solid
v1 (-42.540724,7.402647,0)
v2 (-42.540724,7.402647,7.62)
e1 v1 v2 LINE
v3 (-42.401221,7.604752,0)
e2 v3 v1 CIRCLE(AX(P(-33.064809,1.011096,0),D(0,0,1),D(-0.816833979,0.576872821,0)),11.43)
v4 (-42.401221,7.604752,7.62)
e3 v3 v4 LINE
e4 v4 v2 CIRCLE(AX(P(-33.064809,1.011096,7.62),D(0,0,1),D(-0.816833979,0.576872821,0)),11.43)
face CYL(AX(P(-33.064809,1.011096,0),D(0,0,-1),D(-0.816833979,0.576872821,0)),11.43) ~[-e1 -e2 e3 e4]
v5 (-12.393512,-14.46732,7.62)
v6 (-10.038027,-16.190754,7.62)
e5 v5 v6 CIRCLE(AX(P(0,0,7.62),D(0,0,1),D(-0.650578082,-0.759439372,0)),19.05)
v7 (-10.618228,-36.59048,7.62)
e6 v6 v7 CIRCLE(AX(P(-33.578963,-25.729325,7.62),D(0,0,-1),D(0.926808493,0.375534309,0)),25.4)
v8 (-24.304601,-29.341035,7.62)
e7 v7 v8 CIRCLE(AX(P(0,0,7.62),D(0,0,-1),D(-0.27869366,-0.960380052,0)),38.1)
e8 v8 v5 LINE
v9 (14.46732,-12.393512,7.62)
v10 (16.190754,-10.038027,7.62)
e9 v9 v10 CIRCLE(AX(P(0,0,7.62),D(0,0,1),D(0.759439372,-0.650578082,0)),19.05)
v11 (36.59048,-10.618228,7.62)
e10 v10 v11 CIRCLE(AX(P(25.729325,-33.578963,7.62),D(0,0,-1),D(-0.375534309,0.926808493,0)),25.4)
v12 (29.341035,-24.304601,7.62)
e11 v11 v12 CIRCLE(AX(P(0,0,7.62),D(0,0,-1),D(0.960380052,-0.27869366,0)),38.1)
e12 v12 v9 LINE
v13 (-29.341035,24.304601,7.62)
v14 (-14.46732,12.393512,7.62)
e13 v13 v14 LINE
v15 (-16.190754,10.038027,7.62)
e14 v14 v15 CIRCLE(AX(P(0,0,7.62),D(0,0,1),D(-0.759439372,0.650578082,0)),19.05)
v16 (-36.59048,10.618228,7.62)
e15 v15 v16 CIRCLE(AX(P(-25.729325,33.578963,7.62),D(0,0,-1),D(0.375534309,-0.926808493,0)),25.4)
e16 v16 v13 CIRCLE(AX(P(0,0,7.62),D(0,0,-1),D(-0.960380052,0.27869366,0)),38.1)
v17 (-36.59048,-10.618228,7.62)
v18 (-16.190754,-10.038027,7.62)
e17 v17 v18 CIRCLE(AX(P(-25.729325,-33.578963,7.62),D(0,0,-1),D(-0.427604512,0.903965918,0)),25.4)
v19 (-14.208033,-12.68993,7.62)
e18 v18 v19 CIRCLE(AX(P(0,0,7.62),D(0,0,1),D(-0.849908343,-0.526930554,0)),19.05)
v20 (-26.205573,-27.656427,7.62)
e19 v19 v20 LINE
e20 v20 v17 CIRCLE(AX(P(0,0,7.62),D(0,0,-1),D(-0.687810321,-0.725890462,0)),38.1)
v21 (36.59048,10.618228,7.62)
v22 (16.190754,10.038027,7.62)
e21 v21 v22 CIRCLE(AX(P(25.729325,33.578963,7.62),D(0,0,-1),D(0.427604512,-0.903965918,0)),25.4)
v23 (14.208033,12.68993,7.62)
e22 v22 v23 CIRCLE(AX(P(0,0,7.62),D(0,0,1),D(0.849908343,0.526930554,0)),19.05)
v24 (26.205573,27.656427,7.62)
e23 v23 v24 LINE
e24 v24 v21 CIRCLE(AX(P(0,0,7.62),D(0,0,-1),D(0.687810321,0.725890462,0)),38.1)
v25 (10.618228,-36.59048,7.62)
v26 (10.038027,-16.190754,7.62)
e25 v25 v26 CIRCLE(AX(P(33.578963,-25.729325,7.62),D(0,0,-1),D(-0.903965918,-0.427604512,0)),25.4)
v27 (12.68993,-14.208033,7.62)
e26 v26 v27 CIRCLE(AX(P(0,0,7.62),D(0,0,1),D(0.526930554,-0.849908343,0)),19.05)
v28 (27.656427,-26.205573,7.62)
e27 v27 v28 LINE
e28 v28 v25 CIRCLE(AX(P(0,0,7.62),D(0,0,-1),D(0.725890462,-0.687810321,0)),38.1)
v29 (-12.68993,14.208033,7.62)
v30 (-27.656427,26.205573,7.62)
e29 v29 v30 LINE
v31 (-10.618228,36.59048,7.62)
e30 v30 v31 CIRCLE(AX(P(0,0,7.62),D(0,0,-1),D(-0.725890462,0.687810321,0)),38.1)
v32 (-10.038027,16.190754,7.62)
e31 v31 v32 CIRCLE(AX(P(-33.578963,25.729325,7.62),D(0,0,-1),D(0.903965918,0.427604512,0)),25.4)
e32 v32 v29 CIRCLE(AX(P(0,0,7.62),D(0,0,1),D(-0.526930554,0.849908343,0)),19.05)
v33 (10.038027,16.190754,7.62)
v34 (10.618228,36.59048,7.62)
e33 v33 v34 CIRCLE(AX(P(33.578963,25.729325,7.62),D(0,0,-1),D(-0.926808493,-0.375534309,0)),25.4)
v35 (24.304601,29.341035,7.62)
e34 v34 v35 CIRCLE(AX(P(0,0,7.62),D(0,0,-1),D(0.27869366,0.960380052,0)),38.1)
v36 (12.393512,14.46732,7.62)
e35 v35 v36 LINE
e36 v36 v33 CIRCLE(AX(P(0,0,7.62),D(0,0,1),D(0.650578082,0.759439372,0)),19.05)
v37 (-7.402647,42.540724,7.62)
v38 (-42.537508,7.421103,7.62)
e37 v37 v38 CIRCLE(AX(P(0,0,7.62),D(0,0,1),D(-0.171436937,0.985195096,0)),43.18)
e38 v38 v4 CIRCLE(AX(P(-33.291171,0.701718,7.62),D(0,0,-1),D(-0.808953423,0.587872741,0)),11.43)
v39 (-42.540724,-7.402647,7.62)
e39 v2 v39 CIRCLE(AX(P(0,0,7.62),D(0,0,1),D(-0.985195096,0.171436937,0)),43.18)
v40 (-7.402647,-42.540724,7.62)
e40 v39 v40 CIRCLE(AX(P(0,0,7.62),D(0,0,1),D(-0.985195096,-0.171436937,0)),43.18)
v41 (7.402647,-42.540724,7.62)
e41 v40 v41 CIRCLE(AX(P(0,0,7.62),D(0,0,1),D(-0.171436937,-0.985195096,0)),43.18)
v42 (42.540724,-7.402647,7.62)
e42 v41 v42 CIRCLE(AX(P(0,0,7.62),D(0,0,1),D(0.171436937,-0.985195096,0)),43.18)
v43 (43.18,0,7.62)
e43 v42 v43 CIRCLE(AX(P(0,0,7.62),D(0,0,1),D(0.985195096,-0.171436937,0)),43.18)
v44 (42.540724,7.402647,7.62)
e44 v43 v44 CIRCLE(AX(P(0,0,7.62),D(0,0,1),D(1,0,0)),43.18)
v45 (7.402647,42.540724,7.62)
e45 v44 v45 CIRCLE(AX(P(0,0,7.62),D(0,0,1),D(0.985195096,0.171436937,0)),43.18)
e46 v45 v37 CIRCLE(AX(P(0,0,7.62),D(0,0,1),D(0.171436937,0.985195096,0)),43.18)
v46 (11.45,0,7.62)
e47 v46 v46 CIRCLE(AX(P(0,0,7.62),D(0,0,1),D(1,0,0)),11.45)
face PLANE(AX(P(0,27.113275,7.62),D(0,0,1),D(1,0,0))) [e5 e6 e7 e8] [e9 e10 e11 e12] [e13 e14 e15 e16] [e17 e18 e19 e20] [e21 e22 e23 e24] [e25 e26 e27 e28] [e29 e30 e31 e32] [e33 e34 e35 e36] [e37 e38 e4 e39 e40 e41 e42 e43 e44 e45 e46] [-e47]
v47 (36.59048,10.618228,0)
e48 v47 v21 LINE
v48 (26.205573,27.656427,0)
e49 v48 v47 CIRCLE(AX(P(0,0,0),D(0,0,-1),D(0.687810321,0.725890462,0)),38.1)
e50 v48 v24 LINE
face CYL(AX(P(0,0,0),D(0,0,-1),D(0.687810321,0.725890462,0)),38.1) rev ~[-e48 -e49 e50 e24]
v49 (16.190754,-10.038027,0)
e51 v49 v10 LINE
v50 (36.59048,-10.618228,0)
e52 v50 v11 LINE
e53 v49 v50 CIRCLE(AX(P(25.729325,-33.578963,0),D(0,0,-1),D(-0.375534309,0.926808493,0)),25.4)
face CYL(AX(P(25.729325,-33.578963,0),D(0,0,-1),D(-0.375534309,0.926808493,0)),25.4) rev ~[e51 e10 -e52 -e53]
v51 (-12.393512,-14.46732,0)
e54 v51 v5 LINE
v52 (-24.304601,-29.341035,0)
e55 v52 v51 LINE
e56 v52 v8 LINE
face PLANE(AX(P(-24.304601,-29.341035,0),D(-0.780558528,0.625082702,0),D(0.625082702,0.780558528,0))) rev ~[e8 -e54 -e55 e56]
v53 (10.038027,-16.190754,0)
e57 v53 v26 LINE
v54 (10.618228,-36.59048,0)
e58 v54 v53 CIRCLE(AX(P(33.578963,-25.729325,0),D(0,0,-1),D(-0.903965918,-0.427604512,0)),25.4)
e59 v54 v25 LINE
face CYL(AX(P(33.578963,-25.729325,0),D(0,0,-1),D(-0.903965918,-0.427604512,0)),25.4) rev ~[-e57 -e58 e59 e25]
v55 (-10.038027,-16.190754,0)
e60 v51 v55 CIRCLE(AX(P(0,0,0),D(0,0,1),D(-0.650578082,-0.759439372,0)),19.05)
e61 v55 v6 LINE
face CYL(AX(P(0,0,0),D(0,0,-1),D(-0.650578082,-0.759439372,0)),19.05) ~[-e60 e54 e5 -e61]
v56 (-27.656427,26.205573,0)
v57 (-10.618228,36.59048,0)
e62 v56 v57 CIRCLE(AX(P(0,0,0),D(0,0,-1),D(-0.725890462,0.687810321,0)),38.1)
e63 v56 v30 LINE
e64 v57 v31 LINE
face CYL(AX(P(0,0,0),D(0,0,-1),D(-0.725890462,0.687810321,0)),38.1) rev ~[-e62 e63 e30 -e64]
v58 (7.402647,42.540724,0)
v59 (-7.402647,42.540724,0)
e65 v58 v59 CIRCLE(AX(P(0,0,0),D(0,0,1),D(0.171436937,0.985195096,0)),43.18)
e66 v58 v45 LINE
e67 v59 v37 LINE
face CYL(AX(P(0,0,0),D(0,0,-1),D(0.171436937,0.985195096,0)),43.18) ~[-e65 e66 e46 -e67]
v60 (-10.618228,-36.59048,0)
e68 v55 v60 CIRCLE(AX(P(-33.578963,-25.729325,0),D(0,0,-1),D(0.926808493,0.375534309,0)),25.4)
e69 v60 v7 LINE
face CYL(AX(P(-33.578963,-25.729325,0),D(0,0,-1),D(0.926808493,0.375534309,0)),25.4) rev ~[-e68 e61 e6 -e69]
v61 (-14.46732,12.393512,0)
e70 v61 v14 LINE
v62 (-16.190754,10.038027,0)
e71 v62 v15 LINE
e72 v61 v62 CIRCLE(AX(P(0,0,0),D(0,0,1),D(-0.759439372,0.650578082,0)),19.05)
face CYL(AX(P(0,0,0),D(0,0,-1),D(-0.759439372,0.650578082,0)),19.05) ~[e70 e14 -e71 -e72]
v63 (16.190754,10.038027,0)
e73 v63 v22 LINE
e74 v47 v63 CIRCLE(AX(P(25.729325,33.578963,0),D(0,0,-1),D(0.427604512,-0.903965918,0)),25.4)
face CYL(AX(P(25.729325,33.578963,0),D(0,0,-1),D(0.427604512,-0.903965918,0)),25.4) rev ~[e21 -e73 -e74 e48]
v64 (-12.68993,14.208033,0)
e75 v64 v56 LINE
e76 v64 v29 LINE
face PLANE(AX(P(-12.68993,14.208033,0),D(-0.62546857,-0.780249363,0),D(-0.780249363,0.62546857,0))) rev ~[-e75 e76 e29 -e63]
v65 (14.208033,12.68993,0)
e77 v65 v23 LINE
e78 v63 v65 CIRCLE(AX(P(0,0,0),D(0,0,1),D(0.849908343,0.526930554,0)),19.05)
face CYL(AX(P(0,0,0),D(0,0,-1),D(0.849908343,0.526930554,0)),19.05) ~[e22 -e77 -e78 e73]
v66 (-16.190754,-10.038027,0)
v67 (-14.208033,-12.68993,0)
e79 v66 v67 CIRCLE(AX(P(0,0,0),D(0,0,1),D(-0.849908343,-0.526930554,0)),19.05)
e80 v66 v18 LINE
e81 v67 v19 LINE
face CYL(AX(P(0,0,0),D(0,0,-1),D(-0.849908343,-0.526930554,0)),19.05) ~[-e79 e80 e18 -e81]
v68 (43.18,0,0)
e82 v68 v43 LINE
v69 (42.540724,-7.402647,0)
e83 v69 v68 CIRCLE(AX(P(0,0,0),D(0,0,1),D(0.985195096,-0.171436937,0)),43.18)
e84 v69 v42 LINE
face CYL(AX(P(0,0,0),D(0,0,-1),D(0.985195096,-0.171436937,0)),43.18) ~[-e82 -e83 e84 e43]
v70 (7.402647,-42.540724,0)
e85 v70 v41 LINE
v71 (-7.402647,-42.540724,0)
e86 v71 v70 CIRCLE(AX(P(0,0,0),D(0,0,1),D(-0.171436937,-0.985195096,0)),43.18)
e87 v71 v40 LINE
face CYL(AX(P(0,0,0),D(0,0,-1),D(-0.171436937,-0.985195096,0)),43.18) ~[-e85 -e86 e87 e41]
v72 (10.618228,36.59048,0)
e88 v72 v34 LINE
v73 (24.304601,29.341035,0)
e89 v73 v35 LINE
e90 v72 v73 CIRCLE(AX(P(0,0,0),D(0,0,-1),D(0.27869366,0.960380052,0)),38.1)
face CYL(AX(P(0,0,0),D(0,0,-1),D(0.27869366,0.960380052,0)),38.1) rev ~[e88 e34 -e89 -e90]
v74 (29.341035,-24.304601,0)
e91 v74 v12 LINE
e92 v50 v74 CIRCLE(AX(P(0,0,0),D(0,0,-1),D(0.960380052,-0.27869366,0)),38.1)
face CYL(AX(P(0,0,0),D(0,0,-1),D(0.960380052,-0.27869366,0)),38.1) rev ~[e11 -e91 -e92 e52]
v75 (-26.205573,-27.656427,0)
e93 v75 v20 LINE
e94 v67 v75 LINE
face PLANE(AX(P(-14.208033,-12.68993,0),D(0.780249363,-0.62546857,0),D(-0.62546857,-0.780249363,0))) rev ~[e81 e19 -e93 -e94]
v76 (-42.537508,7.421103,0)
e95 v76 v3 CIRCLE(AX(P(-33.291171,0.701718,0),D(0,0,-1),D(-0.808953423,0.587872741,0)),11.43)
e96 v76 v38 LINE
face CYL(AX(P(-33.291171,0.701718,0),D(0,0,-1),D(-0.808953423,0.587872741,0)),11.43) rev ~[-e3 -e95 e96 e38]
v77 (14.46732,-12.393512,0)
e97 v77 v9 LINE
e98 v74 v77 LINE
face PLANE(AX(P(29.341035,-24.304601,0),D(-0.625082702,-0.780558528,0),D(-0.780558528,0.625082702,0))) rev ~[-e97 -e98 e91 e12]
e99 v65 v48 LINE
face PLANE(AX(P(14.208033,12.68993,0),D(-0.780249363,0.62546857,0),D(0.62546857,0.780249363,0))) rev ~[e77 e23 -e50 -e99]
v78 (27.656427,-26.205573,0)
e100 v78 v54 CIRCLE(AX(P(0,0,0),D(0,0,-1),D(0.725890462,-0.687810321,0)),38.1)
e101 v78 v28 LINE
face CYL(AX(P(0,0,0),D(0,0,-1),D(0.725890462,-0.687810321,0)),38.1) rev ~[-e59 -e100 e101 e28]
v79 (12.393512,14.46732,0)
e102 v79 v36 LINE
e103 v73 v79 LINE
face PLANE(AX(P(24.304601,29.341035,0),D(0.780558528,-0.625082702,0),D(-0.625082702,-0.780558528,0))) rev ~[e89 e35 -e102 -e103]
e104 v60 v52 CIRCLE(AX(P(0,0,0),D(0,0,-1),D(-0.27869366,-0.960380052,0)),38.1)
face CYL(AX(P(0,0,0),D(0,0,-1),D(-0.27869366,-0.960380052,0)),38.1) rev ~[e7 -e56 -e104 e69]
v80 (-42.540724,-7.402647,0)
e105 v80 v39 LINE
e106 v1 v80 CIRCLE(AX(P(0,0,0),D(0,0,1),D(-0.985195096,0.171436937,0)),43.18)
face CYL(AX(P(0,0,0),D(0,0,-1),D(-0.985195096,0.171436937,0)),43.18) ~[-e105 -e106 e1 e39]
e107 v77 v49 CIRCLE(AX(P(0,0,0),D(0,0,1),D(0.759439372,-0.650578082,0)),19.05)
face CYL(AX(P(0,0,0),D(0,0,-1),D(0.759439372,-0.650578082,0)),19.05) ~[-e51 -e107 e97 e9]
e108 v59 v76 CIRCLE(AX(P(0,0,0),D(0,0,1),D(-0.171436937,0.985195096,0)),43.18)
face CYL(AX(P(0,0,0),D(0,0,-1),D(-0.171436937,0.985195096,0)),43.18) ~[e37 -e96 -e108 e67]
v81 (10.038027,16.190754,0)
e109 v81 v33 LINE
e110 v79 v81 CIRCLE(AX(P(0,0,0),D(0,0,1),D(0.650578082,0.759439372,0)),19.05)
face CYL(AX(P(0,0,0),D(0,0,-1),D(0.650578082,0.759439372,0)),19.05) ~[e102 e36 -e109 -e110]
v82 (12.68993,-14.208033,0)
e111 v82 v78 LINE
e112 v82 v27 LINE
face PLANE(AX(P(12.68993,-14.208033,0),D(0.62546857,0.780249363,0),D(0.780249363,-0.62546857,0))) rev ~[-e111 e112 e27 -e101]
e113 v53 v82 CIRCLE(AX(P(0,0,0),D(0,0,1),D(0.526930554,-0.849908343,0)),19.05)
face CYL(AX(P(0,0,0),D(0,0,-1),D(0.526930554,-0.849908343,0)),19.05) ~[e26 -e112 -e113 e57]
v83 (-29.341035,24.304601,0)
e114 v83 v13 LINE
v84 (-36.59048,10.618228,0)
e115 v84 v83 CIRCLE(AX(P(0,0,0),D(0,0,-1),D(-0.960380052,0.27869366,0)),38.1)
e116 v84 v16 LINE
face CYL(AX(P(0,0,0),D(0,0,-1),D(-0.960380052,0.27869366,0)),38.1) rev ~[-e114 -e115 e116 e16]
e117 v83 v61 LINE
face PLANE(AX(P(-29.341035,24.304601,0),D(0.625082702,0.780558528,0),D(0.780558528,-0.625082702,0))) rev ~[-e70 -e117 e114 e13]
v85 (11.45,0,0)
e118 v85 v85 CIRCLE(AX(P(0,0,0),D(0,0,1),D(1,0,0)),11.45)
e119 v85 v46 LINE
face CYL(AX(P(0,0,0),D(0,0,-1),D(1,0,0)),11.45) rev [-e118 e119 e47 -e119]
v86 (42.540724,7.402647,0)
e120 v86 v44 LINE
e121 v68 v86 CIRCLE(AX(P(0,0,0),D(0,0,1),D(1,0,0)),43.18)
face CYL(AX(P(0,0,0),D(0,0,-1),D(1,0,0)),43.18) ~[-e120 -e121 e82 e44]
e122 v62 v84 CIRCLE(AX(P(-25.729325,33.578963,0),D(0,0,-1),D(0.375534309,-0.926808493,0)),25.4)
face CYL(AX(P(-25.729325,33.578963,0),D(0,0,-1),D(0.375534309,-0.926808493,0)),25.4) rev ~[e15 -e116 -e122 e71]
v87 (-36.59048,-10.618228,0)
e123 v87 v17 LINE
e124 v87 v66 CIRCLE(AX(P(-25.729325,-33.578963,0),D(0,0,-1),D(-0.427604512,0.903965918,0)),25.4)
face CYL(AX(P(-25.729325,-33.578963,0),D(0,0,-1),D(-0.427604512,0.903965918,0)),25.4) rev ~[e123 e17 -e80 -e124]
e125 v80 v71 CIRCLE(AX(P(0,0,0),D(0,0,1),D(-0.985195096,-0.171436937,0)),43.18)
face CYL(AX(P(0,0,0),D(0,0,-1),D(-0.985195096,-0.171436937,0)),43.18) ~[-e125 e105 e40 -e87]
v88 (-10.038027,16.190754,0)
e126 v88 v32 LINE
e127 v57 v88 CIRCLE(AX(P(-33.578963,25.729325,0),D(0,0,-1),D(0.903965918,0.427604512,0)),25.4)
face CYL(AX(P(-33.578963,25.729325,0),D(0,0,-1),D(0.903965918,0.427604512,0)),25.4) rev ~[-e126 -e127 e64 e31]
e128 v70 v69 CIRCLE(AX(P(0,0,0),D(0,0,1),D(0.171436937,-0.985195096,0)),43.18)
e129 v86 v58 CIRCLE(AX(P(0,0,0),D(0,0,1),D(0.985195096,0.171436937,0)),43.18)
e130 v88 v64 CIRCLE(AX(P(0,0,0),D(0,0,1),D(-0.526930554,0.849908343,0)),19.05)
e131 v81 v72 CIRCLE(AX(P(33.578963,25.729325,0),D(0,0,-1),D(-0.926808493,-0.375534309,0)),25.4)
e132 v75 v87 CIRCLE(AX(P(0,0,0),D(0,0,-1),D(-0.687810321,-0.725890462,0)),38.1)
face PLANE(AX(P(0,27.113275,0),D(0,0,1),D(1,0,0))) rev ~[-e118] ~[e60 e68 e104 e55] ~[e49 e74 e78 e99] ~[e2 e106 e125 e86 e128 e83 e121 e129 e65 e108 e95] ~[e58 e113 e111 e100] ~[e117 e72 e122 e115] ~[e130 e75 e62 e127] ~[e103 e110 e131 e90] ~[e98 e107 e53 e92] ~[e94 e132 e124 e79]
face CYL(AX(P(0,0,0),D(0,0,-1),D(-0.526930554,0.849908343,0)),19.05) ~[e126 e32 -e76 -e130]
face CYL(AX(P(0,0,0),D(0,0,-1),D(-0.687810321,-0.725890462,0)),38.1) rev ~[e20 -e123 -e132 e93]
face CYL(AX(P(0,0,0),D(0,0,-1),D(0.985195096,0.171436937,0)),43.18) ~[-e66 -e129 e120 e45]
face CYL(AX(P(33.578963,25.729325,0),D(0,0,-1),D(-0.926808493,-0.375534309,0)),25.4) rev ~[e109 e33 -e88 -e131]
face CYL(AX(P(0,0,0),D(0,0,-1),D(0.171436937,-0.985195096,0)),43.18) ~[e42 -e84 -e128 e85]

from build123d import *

# Parameters (mm, degrees)
F0_R     = 11.45
F1_DEPTH = 7.62


# Not quite as in the source:
# - a feature names something its author has since deleted; it is built from what else it names


with BuildPart() as f1:
    # F0 (on Top) → F1 (new body)
    with BuildSketch(Plane.XY):
        with BuildLine():
            ThreePointArc((-10.038027058, 16.1907539288), (0, 19.05), (10.038027058, 16.1907539288))
            ThreePointArc((10.038027058, 16.1907539288), (8.1892299167, 26.451450684), (10.618228457, 36.59047997))
            ThreePointArc((10.618228457, 36.59047997), (0, 38.1), (-10.618228457, 36.59047997))
            ThreePointArc((-10.618228457, 36.59047997), (-8.1892299167, 26.451450684), (-10.038027058, 16.1907539288))
        make_face()
        with BuildLine():
            ThreePointArc((16.1907539288, -10.038027058), (18.3212494435, -5.2186510544), (19.05, 0))
            ThreePointArc((19.05, 0), (18.3212494435, 5.2186510544), (16.1907539288, 10.038027058))
            ThreePointArc((16.1907539288, 10.038027058), (15.2571196867, 11.4071380664), (14.208032523, 12.6899295438))
            ThreePointArc((14.208032523, 12.6899295438), (13.3304286547, 13.6089004655), (12.3935124609, 14.4673200311))
            ThreePointArc((12.3935124609, 14.4673200311), (11.2488242673, 15.3742138857), (10.038027058, 16.1907539288))
            ThreePointArc((10.038027058, 16.1907539288), (0, 19.05), (-10.038027058, 16.1907539288))
            ThreePointArc((-10.038027058, 16.1907539288), (-11.4071380664, 15.2571196867), (-12.6899295437, 14.208032523))
            ThreePointArc((-12.6899295437, 14.208032523), (-13.6089004655, 13.3304286548), (-14.467320031, 12.3935124609))
            ThreePointArc((-14.467320031, 12.3935124609), (-15.3742138857, 11.2488242673), (-16.1907539288, 10.038027058))
            ThreePointArc((-16.1907539288, 10.038027058), (-19.05, 0), (-16.1907539288, -10.038027058))
            ThreePointArc((-16.1907539288, -10.038027058), (-15.2571196867, -11.4071380664), (-14.208032523, -12.6899295437))
            ThreePointArc((-14.208032523, -12.6899295437), (-13.3304286548, -13.6089004655), (-12.3935124609, -14.467320031))
            ThreePointArc((-12.3935124609, -14.467320031), (-11.2488242673, -15.3742138857), (-10.038027058, -16.1907539288))
            ThreePointArc((-10.038027058, -16.1907539288), (0, -19.05), (10.038027058, -16.1907539288))
            ThreePointArc((10.038027058, -16.1907539288), (11.4071380664, -15.2571196867), (12.6899295438, -14.208032523))
            ThreePointArc((12.6899295438, -14.208032523), (13.6089004655, -13.3304286547), (14.4673200311, -12.3935124609))
            ThreePointArc((14.4673200311, -12.3935124609), (15.3742138857, -11.2488242673), (16.1907539288, -10.038027058))
        make_face()
        Circle(F0_R, mode=Mode.SUBTRACT)
        with BuildLine():
            ThreePointArc((-10.618228457, 36.59047997), (0, 38.1), (10.618228457, 36.59047997))
            ThreePointArc((10.618228457, 36.59047997), (10.9631553547, 37.2915593412), (11.3294826074, 37.9816978733))
            ThreePointArc((11.3294826074, 37.9816978733), (9.6714472488, 40.5242467677), (7.4026469551, 42.5407242305))
            ThreePointArc((7.4026469551, 42.5407242305), (0, 43.18), (-7.4026469551, 42.5407242305))
            ThreePointArc((-7.4026469551, 42.5407242305), (-9.6714472488, 40.5242467677), (-11.3294826074, 37.9816978733))
            ThreePointArc((-11.3294826074, 37.9816978733), (-10.9631553547, 37.2915593412), (-10.618228457, 36.59047997))
        make_face()
        with BuildLine():
            ThreePointArc((-27.6564265836, 26.2055732359), (-19.8292429656, 32.5332310632), (-10.618228457, 36.59047997))
            ThreePointArc((-10.618228457, 36.59047997), (-10.9631553547, 37.2915593412), (-11.3294826074, 37.9816978733))
            ThreePointArc((-11.3294826074, 37.9816978733), (-9.6714472488, 40.5242467677), (-7.4026469551, 42.5407242305))
            ThreePointArc((-7.4026469551, 42.5407242305), (-30.5262465043, 30.5394936821), (-42.5375084691, 7.4211032363))
            ThreePointArc((-42.5375084691, 7.4211032363), (-42.4698240182, 7.5132687267), (-42.401220917, 7.6047524795))
            ThreePointArc((-42.401220917, 7.6047524795), (-40.430781391, 9.7510814924), (-37.9816978733, 11.3294826074))
            ThreePointArc((-37.9816978733, 11.3294826074), (-37.2915593412, 10.9631553547), (-36.59047997, 10.618228457))
            ThreePointArc((-36.59047997, 10.618228457), (-33.6685368778, 17.8336654815), (-29.3410352271, 24.3046014533))
            ThreePointArc((-29.3410352271, 24.3046014533), (-28.5145767397, 25.2691296517), (-27.6564265836, 26.2055732359))
        make_face()
        with BuildLine():
            ThreePointArc((-11.3294826074, -37.9816978733), (-10.9631553547, -37.2915593412), (-10.618228457, -36.59047997))
            ThreePointArc((-10.618228457, -36.59047997), (-17.8336654815, -33.6685368778), (-24.3046014533, -29.3410352271))
            ThreePointArc((-24.3046014533, -29.3410352271), (-25.2691296517, -28.5145767397), (-26.2055732359, -27.6564265836))
            ThreePointArc((-26.2055732359, -27.6564265836), (-32.5332310632, -19.8292429656), (-36.59047997, -10.618228457))
            ThreePointArc((-36.59047997, -10.618228457), (-37.2915593412, -10.9631553547), (-37.9816978733, -11.3294826074))
            ThreePointArc((-37.9816978733, -11.3294826074), (-40.5242467677, -9.6714472488), (-42.5407242305, -7.4026469551))
            ThreePointArc((-42.5407242305, -7.4026469551), (-30.5328708116, -30.5328708116), (-7.4026469551, -42.5407242305))
            ThreePointArc((-7.4026469551, -42.5407242305), (-9.6714472488, -40.5242467677), (-11.3294826074, -37.9816978733))
        make_face()
        with BuildLine():
            Line((-24.3046014533, -29.3410352271), (-12.3935124609, -14.467320031))
            ThreePointArc((-12.3935124609, -14.467320031), (-13.3304286548, -13.6089004655), (-14.208032523, -12.6899295437))
            Line((-14.208032523, -12.6899295437), (-26.2055732359, -27.6564265836))
            ThreePointArc((-26.2055732359, -27.6564265836), (-25.2691296517, -28.5145767397), (-24.3046014533, -29.3410352271))
        make_face()
        with BuildLine():
            ThreePointArc((10.6182284569, -36.59047997), (8.1892299167, -26.451450684), (10.038027058, -16.1907539288))
            ThreePointArc((10.038027058, -16.1907539288), (0, -19.05), (-10.038027058, -16.1907539288))
            ThreePointArc((-10.038027058, -16.1907539288), (-8.1892299167, -26.451450684), (-10.618228457, -36.59047997))
            ThreePointArc((-10.618228457, -36.59047997), (0, -38.1), (10.6182284569, -36.59047997))
        make_face()
        with BuildLine():
            ThreePointArc((11.3294826074, -37.9816978733), (10.9631553547, -37.2915593412), (10.6182284569, -36.59047997))
            ThreePointArc((10.6182284569, -36.59047997), (0, -38.1), (-10.618228457, -36.59047997))
            ThreePointArc((-10.618228457, -36.59047997), (-10.9631553547, -37.2915593412), (-11.3294826074, -37.9816978733))
            ThreePointArc((-11.3294826074, -37.9816978733), (-9.6714472488, -40.5242467677), (-7.4026469551, -42.5407242305))
            ThreePointArc((-7.4026469551, -42.5407242305), (0, -43.18), (7.4026469551, -42.5407242305))
            ThreePointArc((7.4026469551, -42.5407242305), (9.6714472488, -40.5242467677), (11.3294826074, -37.9816978733))
        make_face()
        with BuildLine():
            ThreePointArc((37.9816978733, 11.3294826074), (37.2915593412, 10.9631553547), (36.59047997, 10.6182284569))
            ThreePointArc((36.59047997, 10.6182284569), (37.7207322759, 5.3624953679), (38.1, 0))
            ThreePointArc((38.1, 0), (37.7207322759, -5.3624953679), (36.59047997, -10.618228457))
            ThreePointArc((36.59047997, -10.618228457), (37.2915593412, -10.9631553547), (37.9816978733, -11.3294826074))
            ThreePointArc((37.9816978733, -11.3294826074), (40.5242467677, -9.6714472488), (42.5407242305, -7.4026469551))
            ThreePointArc((42.5407242305, -7.4026469551), (43.0198841948, -3.7150994419), (43.18, 0))
            ThreePointArc((43.18, 0), (43.0198841948, 3.7150994419), (42.5407242305, 7.4026469551))
            ThreePointArc((42.5407242305, 7.4026469551), (40.5242467677, 9.6714472488), (37.9816978733, 11.3294826074))
        make_face()
        with BuildLine():
            ThreePointArc((16.1907539288, 10.038027058), (18.3212494435, 5.2186510544), (19.05, 0))
            ThreePointArc((19.05, 0), (18.3212494435, -5.2186510544), (16.1907539288, -10.038027058))
            ThreePointArc((16.1907539288, -10.038027058), (26.451450684, -8.1892299167), (36.59047997, -10.618228457))
            ThreePointArc((36.59047997, -10.618228457), (37.7207322759, -5.3624953679), (38.1, 0))
            ThreePointArc((38.1, 0), (37.7207322759, 5.3624953679), (36.59047997, 10.6182284569))
            ThreePointArc((36.59047997, 10.6182284569), (26.451450684, 8.1892299167), (16.1907539288, 10.038027058))
        make_face()
        with BuildLine():
            Line((29.3410352271, -24.3046014533), (14.467320031, -12.3935124609))
            ThreePointArc((14.4673200311, -12.3935124609), (13.6089004655, -13.3304286547), (12.6899295438, -14.208032523))
            Line((12.6899295437, -14.208032523), (27.6564265836, -26.2055732359))
            ThreePointArc((27.6564265836, -26.2055732359), (28.5145767397, -25.2691296517), (29.3410352271, -24.3046014533))
        make_face()
        with BuildLine():
            ThreePointArc((-14.467320031, 12.3935124609), (-13.6089004655, 13.3304286548), (-12.6899295437, 14.208032523))
            Line((-12.6899295437, 14.208032523), (-27.6564265836, 26.2055732359))
            ThreePointArc((-27.6564265836, 26.2055732359), (-28.5145767397, 25.2691296517), (-29.3410352271, 24.3046014533))
            Line((-29.3410352271, 24.3046014533), (-14.467320031, 12.3935124609))
        make_face()
        with BuildLine():
            ThreePointArc((12.3935124609, 14.4673200311), (13.3304286547, 13.6089004655), (14.208032523, 12.6899295438))
            Line((14.208032523, 12.6899295438), (26.2055732359, 27.6564265836))
            ThreePointArc((26.2055732359, 27.6564265836), (25.2691296517, 28.5145767397), (24.3046014533, 29.3410352271))
            Line((24.3046014533, 29.3410352271), (12.3935124609, 14.4673200311))
        make_face()
        with BuildLine():
            ThreePointArc((37.9816978733, -11.3294826074), (37.2915593412, -10.9631553547), (36.59047997, -10.618228457))
            ThreePointArc((36.59047997, -10.618228457), (33.6685368778, -17.8336654815), (29.3410352271, -24.3046014533))
            ThreePointArc((29.3410352271, -24.3046014533), (28.5145767397, -25.2691296517), (27.6564265836, -26.2055732359))
            ThreePointArc((27.6564265836, -26.2055732359), (19.8292429656, -32.5332310632), (10.6182284569, -36.59047997))
            ThreePointArc((10.6182284569, -36.59047997), (10.9631553547, -37.2915593412), (11.3294826074, -37.9816978733))
            ThreePointArc((11.3294826074, -37.9816978733), (9.6714472488, -40.5242467677), (7.4026469551, -42.5407242305))
            ThreePointArc((7.4026469551, -42.5407242305), (30.5328708116, -30.5328708116), (42.5407242305, -7.4026469551))
            ThreePointArc((42.5407242305, -7.4026469551), (40.5242467677, -9.6714472488), (37.9816978733, -11.3294826074))
        make_face()
        with BuildLine():
            ThreePointArc((26.2055732359, 27.6564265836), (32.5332310632, 19.8292429656), (36.59047997, 10.6182284569))
            ThreePointArc((36.59047997, 10.6182284569), (37.2915593412, 10.9631553547), (37.9816978733, 11.3294826074))
            ThreePointArc((37.9816978733, 11.3294826074), (40.5242467677, 9.6714472488), (42.5407242305, 7.4026469551))
            ThreePointArc((42.5407242305, 7.4026469551), (30.5328708116, 30.5328708116), (7.4026469551, 42.5407242305))
            ThreePointArc((7.4026469551, 42.5407242305), (9.6714472488, 40.5242467677), (11.3294826074, 37.9816978733))
            ThreePointArc((11.3294826074, 37.9816978733), (10.9631553547, 37.2915593412), (10.618228457, 36.59047997))
            ThreePointArc((10.618228457, 36.59047997), (17.8336654815, 33.6685368778), (24.3046014533, 29.3410352271))
            ThreePointArc((24.3046014533, 29.3410352271), (25.2691296517, 28.5145767397), (26.2055732359, 27.6564265836))
        make_face()
        with BuildLine():
            ThreePointArc((-16.1907539288, -10.038027058), (-19.05, 0), (-16.1907539288, 10.038027058))
            ThreePointArc((-16.1907539288, 10.038027058), (-26.451450684, 8.1892299167), (-36.59047997, 10.618228457))
            ThreePointArc((-36.59047997, 10.618228457), (-38.1, 0), (-36.59047997, -10.618228457))
            ThreePointArc((-36.59047997, -10.618228457), (-26.451450684, -8.1892299167), (-16.1907539288, -10.038027058))
        make_face()
        with BuildLine():
            ThreePointArc((-42.5407242305, 7.4026469551), (-43.18, 0), (-42.5407242305, -7.4026469551))
            ThreePointArc((-42.5407242305, -7.4026469551), (-40.5242467677, -9.6714472488), (-37.9816978733, -11.3294826074))
            ThreePointArc((-37.9816978733, -11.3294826074), (-37.2915593412, -10.9631553547), (-36.59047997, -10.618228457))
            ThreePointArc((-36.59047997, -10.618228457), (-38.1, 0), (-36.59047997, 10.618228457))
            ThreePointArc((-36.59047997, 10.618228457), (-37.2915593412, 10.9631553547), (-37.9816978733, 11.3294826074))
            ThreePointArc((-37.9816978733, 11.3294826074), (-40.430781391, 9.7510814924), (-42.401220917, 7.6047524795))
            ThreePointArc((-42.401220917, 7.6047524795), (-42.4715153756, 7.5040743862), (-42.5407242305, 7.4026469551))
        make_face()
    extrude(amount=F1_DEPTH)


solid = f1.part
